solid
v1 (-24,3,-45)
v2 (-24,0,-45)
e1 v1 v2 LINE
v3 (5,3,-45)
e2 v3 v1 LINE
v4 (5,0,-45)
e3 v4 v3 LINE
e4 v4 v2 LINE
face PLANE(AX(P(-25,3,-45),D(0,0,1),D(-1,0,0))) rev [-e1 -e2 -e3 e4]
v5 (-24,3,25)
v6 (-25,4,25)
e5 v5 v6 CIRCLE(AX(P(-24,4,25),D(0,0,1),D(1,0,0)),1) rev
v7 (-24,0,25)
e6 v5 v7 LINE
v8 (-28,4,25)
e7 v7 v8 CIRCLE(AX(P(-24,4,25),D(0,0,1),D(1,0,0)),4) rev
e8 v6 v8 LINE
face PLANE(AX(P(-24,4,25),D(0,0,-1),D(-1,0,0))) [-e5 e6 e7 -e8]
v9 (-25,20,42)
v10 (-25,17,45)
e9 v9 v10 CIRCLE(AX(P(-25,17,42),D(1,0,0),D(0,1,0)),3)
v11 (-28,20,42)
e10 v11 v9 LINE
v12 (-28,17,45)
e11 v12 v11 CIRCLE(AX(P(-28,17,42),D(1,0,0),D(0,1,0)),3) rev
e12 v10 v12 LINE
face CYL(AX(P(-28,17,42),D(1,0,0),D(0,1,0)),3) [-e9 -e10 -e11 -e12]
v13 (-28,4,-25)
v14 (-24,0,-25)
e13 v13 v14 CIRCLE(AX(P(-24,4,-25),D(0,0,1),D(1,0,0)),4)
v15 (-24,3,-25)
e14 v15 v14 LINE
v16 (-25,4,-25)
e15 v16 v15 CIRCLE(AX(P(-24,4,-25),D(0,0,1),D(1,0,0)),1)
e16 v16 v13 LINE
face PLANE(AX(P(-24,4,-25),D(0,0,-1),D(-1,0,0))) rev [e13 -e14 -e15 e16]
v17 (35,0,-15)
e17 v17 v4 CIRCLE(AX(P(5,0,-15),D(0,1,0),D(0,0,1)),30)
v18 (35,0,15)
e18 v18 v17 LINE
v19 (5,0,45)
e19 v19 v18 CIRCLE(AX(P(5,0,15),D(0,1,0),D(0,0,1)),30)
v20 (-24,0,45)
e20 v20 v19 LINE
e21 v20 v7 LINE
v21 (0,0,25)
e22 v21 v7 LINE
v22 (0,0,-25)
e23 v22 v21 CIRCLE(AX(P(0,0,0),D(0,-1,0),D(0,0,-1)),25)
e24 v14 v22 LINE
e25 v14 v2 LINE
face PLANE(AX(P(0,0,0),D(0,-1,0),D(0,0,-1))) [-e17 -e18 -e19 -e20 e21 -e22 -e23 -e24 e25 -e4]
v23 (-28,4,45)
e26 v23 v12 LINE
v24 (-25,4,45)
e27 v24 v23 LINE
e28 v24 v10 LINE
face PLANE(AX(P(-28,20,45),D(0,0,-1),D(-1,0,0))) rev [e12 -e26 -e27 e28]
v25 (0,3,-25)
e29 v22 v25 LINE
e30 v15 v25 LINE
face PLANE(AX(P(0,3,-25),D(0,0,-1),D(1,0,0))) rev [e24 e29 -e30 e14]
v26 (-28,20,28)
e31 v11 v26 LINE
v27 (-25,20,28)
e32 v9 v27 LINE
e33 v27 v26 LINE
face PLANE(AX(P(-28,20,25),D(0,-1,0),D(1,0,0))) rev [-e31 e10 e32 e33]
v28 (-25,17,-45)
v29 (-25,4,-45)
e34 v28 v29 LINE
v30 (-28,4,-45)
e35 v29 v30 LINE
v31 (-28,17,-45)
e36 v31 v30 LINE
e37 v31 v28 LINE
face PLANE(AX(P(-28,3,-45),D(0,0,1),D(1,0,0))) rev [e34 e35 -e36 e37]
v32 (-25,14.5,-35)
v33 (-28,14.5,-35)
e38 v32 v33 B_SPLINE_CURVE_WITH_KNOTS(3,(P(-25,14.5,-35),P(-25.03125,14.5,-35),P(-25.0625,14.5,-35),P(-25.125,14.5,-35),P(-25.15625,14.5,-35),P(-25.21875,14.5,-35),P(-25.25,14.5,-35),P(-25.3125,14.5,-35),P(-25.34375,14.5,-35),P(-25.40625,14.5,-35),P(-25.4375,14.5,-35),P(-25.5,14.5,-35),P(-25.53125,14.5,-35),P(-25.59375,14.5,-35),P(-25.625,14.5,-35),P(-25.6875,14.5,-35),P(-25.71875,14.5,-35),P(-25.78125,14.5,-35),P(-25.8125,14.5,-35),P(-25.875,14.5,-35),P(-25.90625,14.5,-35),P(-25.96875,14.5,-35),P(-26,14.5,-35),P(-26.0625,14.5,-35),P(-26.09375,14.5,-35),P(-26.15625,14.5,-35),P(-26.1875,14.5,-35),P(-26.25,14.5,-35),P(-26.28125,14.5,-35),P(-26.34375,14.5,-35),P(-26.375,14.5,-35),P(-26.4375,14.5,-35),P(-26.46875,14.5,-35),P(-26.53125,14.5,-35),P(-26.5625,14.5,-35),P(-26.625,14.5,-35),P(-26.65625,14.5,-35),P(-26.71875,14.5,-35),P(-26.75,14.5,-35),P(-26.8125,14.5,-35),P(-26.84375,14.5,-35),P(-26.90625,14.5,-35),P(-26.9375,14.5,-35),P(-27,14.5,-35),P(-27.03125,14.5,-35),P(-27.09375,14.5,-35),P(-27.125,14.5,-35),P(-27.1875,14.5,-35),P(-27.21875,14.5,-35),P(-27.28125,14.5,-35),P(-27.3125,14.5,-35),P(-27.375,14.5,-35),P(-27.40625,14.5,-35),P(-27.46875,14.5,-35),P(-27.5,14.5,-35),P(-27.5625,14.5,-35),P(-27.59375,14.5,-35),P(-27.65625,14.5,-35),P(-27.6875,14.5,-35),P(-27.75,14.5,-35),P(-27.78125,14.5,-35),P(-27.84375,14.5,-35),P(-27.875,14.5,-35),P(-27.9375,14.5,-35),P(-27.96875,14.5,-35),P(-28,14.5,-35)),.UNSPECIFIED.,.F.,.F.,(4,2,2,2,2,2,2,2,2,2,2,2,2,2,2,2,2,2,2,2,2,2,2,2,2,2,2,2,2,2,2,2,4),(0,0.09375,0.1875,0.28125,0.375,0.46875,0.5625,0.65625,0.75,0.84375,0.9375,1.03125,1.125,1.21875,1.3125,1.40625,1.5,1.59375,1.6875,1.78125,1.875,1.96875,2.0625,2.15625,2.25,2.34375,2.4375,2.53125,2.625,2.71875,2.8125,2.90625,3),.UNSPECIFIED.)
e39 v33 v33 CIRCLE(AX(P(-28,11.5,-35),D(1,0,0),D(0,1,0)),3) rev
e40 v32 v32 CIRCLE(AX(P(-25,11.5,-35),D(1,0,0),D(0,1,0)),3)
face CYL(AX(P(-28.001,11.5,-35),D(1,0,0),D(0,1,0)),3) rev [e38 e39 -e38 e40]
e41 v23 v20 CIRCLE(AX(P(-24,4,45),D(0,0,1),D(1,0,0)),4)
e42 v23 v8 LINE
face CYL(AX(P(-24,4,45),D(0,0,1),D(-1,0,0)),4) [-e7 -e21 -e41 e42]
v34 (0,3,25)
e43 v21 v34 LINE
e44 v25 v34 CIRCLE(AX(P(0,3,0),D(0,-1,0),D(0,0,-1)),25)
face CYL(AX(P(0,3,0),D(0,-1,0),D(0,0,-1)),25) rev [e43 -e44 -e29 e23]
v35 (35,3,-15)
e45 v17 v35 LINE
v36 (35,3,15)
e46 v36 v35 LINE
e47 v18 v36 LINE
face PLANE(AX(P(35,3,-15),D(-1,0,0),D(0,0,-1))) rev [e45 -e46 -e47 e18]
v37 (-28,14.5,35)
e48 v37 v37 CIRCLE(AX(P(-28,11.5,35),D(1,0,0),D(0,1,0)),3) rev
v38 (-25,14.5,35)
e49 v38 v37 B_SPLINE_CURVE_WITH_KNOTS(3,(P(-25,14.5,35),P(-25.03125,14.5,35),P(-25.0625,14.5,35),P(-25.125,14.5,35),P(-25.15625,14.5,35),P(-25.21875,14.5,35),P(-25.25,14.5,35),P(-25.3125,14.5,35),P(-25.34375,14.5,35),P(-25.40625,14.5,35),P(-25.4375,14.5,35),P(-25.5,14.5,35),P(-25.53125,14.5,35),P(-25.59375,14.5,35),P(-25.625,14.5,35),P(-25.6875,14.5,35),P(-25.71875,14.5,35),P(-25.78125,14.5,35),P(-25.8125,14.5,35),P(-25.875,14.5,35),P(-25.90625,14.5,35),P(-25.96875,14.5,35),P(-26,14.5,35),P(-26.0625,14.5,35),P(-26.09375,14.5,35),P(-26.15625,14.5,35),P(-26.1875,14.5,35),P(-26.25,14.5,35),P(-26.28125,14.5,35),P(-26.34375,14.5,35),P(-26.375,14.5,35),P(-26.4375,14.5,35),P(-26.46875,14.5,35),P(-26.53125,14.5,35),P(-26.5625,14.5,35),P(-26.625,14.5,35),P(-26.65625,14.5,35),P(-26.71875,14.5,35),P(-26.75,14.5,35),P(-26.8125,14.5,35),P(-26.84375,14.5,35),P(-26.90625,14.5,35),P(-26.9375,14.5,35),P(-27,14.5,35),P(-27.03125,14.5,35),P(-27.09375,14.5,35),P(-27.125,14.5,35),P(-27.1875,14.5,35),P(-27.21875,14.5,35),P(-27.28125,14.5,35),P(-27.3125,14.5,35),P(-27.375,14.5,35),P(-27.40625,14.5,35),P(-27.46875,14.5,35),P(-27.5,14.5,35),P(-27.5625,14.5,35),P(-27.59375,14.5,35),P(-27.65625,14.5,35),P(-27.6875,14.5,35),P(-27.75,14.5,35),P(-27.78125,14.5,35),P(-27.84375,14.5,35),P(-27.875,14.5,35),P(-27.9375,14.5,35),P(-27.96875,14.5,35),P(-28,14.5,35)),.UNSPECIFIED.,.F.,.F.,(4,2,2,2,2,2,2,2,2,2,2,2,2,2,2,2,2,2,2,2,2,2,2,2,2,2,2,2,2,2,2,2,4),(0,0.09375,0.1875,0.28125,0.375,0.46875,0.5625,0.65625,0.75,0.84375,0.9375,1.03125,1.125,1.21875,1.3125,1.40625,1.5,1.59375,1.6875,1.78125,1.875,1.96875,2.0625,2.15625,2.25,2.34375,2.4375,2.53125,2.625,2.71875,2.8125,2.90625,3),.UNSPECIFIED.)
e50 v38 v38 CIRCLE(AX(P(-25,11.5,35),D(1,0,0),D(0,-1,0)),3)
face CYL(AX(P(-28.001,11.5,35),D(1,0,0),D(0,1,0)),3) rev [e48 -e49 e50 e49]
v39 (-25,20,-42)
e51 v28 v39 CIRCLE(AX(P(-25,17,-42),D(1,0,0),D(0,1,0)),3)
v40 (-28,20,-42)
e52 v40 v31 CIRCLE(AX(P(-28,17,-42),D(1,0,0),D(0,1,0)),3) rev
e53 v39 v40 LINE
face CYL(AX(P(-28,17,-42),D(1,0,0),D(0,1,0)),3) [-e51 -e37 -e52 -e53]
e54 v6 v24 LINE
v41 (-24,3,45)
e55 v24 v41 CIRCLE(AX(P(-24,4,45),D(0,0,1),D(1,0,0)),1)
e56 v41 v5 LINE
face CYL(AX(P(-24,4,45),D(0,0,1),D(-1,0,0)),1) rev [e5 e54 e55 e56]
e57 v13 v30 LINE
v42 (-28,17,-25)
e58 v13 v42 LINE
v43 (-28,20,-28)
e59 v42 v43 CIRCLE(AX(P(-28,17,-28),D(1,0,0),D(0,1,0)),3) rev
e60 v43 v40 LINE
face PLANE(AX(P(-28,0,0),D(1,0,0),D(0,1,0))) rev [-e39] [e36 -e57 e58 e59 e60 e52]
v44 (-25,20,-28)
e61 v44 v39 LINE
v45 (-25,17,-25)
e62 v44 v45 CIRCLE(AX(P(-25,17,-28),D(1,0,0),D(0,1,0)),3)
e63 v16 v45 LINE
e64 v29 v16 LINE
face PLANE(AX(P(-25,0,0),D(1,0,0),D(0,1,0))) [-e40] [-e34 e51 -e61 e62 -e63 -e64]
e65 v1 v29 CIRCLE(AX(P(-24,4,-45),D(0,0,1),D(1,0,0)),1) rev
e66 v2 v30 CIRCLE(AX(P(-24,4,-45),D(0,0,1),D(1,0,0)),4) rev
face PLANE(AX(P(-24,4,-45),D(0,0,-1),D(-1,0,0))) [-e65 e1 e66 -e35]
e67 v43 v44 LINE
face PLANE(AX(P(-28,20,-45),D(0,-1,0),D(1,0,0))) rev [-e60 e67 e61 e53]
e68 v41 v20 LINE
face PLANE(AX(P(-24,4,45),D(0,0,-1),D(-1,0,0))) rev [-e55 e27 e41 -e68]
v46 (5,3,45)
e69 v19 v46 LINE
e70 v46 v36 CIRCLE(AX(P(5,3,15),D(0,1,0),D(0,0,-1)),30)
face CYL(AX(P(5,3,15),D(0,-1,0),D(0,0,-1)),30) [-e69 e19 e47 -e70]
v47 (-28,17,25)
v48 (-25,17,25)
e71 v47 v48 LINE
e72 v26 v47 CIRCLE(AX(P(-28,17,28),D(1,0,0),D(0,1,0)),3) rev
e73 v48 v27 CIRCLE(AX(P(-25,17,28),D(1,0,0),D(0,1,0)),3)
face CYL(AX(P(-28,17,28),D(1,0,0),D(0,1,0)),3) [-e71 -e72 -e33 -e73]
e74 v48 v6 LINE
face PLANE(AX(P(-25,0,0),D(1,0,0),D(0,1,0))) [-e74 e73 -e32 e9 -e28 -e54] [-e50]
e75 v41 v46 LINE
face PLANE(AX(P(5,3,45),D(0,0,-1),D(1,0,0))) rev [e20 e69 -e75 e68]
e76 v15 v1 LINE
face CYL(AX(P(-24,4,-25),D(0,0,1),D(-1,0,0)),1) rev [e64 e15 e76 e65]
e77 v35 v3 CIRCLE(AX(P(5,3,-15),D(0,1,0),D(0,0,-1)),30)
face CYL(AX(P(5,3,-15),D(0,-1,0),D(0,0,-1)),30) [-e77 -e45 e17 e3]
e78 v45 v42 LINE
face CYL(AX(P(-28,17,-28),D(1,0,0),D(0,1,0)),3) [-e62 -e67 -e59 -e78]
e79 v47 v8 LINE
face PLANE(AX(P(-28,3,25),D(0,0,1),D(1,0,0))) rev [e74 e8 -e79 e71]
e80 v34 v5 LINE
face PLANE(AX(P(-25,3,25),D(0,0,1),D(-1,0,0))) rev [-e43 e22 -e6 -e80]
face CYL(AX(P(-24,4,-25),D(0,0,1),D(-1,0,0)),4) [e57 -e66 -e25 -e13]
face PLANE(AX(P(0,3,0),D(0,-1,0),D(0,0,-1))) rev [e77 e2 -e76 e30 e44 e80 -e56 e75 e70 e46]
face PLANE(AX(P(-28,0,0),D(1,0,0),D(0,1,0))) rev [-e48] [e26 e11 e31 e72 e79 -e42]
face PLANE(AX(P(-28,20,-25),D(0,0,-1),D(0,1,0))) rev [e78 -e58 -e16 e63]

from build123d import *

# Parameters (mm, degrees)
BOSS_EXTRUDE1_DEPTH            = 3
EDGE_FLANGE1_STRIP_W           = 14
EDGE_FLANGE1_STRIP_H           = 3
EDGE_FLANGE1_STRIP_CUT_DEPTH   = 20
EDGE_FLANGE1_STRIP_2_W         = 14
EDGE_FLANGE1_STRIP_2_H         = 3
EDGE_FLANGE1_STRIP_CUT_2_DEPTH = 20
EDGE_FLANGE1_DEPTH             = 20
EDGE_FLANGE1_BEND_DEPTH        = 20
FILLET1_R                      = 3
CUT_EXTRUDE1_REACH             = 79.621
SKETCH12_R                     = 3


# Sheet-metal steps are written as plain solids
with BuildPart() as part:
    # Sketch1 → Boss-Extrude1 (new body)
    with BuildSketch(Plane(origin=(0, 0, 0), x_dir=(1, 0, 0), z_dir=(0, 1, 0))):
        with BuildLine():
            Line((0, 25), (-25, 25))
            Line((-25, 25), (-25, 45))
            Line((-25, 45), (5, 45))
            ThreePointArc((5, 45), (26.213203436, 36.213203436), (35, 15))
            Line((35, 15), (35, -15))
            ThreePointArc((35, -15), (26.213203436, -36.213203436), (5, -45))
            Line((5, -45), (-25, -45))
            Line((-25, -45), (-25, -25))
            Line((-25, -25), (0, -25))
            ThreePointArc((0, -25), (25, 0), (0, 25))
        make_face()
    extrude(amount=BOSS_EXTRUDE1_DEPTH)

    # Edge-Flange1 strip (across the edge) → Edge-Flange1 strip cut (cut)
    with BuildSketch(Plane(origin=(-25, 3, 25), x_dir=(1, 0, 0), z_dir=(0, 0, 1))):
        with Locations((-6, -1.5)):
            Rectangle(EDGE_FLANGE1_STRIP_W, EDGE_FLANGE1_STRIP_H)
    extrude(amount=EDGE_FLANGE1_STRIP_CUT_DEPTH, mode=Mode.SUBTRACT)

    # Edge-Flange1 strip 2 (across the edge) → Edge-Flange1 strip cut 2 (cut)
    with BuildSketch(Plane(origin=(-25, 3, -45), x_dir=(1, 0, 0), z_dir=(0, 0, 1))):
        with Locations((-6, -1.5)):
            Rectangle(EDGE_FLANGE1_STRIP_2_W, EDGE_FLANGE1_STRIP_2_H)
    extrude(amount=EDGE_FLANGE1_STRIP_CUT_2_DEPTH, mode=Mode.SUBTRACT)

    # Edge-Flange1 section (across the edge) → Edge-Flange1 (add)
    with BuildSketch(Plane(origin=(-25, 3, 25), x_dir=(1, 0, 0), z_dir=(0, 0, 1))):
        with BuildLine():
            Line((-3, 1), (-3, 17))
            Line((-3, 17), (0, 17))
            Line((0, 17), (0, 1))
            ThreePointArc((0, 1), (0.292893219, 0.292893219), (1, 0))
            Line((1, 0), (1, -3))
            ThreePointArc((1, -3), (-1.828427125, -1.828427125), (-3, 1))
        make_face()
    extrude(amount=EDGE_FLANGE1_DEPTH)

    # Edge-Flange1 section 2 (across the edge) → Edge-Flange1 bend (add)
    with BuildSketch(Plane(origin=(-25, 3, -45), x_dir=(1, 0, 0), z_dir=(0, 0, 1))):
        with BuildLine():
            Line((-3, 1), (-3, 17))
            Line((-3, 17), (0, 17))
            Line((0, 17), (0, 1))
            ThreePointArc((0, 1), (0.292893219, 0.292893219), (1, 0))
            Line((1, 0), (1, -3))
            ThreePointArc((1, -3), (-1.828427125, -1.828427125), (-3, 1))
        make_face()
    extrude(amount=EDGE_FLANGE1_BEND_DEPTH)

    # Fillet1
    fillet1_edges = [part.edges().sort_by_distance(p)[0] for p in [
        (-26.5, 20, 25),
        (-26.5, 20, 45),
        (-26.5, 20, -45),
        (-26.5, 20, -25),
    ]]
    fillet(fillet1_edges, radius=FILLET1_R)

    # Sketch12 → Cut-Extrude1 (cut, up to next)
    with BuildSketch(Plane(origin=(-25, 0, 0), x_dir=(0, 0, -1), z_dir=(1, 0, 0)), mode=Mode.PRIVATE) as cut_extrude1_sk1:
        with Locations(Location((35, 11.5, 0), (0, 0, 90))):
            Circle(SKETCH12_R)
    cut_extrude1_tool1 = extrude(cut_extrude1_sk1.sketch, amount=-CUT_EXTRUDE1_REACH, mode=Mode.PRIVATE) & part.part
    # Sketch12 → Cut-Extrude1 (cut, up to next)
    with BuildSketch(Plane(origin=(-25, 0, 0), x_dir=(0, 0, -1), z_dir=(1, 0, 0)), mode=Mode.PRIVATE) as cut_extrude1_sk2:
        with Locations(Location((-35, 11.5, 0), (0, 0, 90))):
            Circle(SKETCH12_R)
    cut_extrude1_tool2 = extrude(cut_extrude1_sk2.sketch, amount=-CUT_EXTRUDE1_REACH, mode=Mode.PRIVATE) & part.part
    add(cut_extrude1_tool1.solids().sort_by_distance((-25, 11.5, -35))[0], mode=Mode.SUBTRACT)
    add(cut_extrude1_tool2.solids().sort_by_distance((-25, 11.5, 35))[0], mode=Mode.SUBTRACT)


solid = part.part
